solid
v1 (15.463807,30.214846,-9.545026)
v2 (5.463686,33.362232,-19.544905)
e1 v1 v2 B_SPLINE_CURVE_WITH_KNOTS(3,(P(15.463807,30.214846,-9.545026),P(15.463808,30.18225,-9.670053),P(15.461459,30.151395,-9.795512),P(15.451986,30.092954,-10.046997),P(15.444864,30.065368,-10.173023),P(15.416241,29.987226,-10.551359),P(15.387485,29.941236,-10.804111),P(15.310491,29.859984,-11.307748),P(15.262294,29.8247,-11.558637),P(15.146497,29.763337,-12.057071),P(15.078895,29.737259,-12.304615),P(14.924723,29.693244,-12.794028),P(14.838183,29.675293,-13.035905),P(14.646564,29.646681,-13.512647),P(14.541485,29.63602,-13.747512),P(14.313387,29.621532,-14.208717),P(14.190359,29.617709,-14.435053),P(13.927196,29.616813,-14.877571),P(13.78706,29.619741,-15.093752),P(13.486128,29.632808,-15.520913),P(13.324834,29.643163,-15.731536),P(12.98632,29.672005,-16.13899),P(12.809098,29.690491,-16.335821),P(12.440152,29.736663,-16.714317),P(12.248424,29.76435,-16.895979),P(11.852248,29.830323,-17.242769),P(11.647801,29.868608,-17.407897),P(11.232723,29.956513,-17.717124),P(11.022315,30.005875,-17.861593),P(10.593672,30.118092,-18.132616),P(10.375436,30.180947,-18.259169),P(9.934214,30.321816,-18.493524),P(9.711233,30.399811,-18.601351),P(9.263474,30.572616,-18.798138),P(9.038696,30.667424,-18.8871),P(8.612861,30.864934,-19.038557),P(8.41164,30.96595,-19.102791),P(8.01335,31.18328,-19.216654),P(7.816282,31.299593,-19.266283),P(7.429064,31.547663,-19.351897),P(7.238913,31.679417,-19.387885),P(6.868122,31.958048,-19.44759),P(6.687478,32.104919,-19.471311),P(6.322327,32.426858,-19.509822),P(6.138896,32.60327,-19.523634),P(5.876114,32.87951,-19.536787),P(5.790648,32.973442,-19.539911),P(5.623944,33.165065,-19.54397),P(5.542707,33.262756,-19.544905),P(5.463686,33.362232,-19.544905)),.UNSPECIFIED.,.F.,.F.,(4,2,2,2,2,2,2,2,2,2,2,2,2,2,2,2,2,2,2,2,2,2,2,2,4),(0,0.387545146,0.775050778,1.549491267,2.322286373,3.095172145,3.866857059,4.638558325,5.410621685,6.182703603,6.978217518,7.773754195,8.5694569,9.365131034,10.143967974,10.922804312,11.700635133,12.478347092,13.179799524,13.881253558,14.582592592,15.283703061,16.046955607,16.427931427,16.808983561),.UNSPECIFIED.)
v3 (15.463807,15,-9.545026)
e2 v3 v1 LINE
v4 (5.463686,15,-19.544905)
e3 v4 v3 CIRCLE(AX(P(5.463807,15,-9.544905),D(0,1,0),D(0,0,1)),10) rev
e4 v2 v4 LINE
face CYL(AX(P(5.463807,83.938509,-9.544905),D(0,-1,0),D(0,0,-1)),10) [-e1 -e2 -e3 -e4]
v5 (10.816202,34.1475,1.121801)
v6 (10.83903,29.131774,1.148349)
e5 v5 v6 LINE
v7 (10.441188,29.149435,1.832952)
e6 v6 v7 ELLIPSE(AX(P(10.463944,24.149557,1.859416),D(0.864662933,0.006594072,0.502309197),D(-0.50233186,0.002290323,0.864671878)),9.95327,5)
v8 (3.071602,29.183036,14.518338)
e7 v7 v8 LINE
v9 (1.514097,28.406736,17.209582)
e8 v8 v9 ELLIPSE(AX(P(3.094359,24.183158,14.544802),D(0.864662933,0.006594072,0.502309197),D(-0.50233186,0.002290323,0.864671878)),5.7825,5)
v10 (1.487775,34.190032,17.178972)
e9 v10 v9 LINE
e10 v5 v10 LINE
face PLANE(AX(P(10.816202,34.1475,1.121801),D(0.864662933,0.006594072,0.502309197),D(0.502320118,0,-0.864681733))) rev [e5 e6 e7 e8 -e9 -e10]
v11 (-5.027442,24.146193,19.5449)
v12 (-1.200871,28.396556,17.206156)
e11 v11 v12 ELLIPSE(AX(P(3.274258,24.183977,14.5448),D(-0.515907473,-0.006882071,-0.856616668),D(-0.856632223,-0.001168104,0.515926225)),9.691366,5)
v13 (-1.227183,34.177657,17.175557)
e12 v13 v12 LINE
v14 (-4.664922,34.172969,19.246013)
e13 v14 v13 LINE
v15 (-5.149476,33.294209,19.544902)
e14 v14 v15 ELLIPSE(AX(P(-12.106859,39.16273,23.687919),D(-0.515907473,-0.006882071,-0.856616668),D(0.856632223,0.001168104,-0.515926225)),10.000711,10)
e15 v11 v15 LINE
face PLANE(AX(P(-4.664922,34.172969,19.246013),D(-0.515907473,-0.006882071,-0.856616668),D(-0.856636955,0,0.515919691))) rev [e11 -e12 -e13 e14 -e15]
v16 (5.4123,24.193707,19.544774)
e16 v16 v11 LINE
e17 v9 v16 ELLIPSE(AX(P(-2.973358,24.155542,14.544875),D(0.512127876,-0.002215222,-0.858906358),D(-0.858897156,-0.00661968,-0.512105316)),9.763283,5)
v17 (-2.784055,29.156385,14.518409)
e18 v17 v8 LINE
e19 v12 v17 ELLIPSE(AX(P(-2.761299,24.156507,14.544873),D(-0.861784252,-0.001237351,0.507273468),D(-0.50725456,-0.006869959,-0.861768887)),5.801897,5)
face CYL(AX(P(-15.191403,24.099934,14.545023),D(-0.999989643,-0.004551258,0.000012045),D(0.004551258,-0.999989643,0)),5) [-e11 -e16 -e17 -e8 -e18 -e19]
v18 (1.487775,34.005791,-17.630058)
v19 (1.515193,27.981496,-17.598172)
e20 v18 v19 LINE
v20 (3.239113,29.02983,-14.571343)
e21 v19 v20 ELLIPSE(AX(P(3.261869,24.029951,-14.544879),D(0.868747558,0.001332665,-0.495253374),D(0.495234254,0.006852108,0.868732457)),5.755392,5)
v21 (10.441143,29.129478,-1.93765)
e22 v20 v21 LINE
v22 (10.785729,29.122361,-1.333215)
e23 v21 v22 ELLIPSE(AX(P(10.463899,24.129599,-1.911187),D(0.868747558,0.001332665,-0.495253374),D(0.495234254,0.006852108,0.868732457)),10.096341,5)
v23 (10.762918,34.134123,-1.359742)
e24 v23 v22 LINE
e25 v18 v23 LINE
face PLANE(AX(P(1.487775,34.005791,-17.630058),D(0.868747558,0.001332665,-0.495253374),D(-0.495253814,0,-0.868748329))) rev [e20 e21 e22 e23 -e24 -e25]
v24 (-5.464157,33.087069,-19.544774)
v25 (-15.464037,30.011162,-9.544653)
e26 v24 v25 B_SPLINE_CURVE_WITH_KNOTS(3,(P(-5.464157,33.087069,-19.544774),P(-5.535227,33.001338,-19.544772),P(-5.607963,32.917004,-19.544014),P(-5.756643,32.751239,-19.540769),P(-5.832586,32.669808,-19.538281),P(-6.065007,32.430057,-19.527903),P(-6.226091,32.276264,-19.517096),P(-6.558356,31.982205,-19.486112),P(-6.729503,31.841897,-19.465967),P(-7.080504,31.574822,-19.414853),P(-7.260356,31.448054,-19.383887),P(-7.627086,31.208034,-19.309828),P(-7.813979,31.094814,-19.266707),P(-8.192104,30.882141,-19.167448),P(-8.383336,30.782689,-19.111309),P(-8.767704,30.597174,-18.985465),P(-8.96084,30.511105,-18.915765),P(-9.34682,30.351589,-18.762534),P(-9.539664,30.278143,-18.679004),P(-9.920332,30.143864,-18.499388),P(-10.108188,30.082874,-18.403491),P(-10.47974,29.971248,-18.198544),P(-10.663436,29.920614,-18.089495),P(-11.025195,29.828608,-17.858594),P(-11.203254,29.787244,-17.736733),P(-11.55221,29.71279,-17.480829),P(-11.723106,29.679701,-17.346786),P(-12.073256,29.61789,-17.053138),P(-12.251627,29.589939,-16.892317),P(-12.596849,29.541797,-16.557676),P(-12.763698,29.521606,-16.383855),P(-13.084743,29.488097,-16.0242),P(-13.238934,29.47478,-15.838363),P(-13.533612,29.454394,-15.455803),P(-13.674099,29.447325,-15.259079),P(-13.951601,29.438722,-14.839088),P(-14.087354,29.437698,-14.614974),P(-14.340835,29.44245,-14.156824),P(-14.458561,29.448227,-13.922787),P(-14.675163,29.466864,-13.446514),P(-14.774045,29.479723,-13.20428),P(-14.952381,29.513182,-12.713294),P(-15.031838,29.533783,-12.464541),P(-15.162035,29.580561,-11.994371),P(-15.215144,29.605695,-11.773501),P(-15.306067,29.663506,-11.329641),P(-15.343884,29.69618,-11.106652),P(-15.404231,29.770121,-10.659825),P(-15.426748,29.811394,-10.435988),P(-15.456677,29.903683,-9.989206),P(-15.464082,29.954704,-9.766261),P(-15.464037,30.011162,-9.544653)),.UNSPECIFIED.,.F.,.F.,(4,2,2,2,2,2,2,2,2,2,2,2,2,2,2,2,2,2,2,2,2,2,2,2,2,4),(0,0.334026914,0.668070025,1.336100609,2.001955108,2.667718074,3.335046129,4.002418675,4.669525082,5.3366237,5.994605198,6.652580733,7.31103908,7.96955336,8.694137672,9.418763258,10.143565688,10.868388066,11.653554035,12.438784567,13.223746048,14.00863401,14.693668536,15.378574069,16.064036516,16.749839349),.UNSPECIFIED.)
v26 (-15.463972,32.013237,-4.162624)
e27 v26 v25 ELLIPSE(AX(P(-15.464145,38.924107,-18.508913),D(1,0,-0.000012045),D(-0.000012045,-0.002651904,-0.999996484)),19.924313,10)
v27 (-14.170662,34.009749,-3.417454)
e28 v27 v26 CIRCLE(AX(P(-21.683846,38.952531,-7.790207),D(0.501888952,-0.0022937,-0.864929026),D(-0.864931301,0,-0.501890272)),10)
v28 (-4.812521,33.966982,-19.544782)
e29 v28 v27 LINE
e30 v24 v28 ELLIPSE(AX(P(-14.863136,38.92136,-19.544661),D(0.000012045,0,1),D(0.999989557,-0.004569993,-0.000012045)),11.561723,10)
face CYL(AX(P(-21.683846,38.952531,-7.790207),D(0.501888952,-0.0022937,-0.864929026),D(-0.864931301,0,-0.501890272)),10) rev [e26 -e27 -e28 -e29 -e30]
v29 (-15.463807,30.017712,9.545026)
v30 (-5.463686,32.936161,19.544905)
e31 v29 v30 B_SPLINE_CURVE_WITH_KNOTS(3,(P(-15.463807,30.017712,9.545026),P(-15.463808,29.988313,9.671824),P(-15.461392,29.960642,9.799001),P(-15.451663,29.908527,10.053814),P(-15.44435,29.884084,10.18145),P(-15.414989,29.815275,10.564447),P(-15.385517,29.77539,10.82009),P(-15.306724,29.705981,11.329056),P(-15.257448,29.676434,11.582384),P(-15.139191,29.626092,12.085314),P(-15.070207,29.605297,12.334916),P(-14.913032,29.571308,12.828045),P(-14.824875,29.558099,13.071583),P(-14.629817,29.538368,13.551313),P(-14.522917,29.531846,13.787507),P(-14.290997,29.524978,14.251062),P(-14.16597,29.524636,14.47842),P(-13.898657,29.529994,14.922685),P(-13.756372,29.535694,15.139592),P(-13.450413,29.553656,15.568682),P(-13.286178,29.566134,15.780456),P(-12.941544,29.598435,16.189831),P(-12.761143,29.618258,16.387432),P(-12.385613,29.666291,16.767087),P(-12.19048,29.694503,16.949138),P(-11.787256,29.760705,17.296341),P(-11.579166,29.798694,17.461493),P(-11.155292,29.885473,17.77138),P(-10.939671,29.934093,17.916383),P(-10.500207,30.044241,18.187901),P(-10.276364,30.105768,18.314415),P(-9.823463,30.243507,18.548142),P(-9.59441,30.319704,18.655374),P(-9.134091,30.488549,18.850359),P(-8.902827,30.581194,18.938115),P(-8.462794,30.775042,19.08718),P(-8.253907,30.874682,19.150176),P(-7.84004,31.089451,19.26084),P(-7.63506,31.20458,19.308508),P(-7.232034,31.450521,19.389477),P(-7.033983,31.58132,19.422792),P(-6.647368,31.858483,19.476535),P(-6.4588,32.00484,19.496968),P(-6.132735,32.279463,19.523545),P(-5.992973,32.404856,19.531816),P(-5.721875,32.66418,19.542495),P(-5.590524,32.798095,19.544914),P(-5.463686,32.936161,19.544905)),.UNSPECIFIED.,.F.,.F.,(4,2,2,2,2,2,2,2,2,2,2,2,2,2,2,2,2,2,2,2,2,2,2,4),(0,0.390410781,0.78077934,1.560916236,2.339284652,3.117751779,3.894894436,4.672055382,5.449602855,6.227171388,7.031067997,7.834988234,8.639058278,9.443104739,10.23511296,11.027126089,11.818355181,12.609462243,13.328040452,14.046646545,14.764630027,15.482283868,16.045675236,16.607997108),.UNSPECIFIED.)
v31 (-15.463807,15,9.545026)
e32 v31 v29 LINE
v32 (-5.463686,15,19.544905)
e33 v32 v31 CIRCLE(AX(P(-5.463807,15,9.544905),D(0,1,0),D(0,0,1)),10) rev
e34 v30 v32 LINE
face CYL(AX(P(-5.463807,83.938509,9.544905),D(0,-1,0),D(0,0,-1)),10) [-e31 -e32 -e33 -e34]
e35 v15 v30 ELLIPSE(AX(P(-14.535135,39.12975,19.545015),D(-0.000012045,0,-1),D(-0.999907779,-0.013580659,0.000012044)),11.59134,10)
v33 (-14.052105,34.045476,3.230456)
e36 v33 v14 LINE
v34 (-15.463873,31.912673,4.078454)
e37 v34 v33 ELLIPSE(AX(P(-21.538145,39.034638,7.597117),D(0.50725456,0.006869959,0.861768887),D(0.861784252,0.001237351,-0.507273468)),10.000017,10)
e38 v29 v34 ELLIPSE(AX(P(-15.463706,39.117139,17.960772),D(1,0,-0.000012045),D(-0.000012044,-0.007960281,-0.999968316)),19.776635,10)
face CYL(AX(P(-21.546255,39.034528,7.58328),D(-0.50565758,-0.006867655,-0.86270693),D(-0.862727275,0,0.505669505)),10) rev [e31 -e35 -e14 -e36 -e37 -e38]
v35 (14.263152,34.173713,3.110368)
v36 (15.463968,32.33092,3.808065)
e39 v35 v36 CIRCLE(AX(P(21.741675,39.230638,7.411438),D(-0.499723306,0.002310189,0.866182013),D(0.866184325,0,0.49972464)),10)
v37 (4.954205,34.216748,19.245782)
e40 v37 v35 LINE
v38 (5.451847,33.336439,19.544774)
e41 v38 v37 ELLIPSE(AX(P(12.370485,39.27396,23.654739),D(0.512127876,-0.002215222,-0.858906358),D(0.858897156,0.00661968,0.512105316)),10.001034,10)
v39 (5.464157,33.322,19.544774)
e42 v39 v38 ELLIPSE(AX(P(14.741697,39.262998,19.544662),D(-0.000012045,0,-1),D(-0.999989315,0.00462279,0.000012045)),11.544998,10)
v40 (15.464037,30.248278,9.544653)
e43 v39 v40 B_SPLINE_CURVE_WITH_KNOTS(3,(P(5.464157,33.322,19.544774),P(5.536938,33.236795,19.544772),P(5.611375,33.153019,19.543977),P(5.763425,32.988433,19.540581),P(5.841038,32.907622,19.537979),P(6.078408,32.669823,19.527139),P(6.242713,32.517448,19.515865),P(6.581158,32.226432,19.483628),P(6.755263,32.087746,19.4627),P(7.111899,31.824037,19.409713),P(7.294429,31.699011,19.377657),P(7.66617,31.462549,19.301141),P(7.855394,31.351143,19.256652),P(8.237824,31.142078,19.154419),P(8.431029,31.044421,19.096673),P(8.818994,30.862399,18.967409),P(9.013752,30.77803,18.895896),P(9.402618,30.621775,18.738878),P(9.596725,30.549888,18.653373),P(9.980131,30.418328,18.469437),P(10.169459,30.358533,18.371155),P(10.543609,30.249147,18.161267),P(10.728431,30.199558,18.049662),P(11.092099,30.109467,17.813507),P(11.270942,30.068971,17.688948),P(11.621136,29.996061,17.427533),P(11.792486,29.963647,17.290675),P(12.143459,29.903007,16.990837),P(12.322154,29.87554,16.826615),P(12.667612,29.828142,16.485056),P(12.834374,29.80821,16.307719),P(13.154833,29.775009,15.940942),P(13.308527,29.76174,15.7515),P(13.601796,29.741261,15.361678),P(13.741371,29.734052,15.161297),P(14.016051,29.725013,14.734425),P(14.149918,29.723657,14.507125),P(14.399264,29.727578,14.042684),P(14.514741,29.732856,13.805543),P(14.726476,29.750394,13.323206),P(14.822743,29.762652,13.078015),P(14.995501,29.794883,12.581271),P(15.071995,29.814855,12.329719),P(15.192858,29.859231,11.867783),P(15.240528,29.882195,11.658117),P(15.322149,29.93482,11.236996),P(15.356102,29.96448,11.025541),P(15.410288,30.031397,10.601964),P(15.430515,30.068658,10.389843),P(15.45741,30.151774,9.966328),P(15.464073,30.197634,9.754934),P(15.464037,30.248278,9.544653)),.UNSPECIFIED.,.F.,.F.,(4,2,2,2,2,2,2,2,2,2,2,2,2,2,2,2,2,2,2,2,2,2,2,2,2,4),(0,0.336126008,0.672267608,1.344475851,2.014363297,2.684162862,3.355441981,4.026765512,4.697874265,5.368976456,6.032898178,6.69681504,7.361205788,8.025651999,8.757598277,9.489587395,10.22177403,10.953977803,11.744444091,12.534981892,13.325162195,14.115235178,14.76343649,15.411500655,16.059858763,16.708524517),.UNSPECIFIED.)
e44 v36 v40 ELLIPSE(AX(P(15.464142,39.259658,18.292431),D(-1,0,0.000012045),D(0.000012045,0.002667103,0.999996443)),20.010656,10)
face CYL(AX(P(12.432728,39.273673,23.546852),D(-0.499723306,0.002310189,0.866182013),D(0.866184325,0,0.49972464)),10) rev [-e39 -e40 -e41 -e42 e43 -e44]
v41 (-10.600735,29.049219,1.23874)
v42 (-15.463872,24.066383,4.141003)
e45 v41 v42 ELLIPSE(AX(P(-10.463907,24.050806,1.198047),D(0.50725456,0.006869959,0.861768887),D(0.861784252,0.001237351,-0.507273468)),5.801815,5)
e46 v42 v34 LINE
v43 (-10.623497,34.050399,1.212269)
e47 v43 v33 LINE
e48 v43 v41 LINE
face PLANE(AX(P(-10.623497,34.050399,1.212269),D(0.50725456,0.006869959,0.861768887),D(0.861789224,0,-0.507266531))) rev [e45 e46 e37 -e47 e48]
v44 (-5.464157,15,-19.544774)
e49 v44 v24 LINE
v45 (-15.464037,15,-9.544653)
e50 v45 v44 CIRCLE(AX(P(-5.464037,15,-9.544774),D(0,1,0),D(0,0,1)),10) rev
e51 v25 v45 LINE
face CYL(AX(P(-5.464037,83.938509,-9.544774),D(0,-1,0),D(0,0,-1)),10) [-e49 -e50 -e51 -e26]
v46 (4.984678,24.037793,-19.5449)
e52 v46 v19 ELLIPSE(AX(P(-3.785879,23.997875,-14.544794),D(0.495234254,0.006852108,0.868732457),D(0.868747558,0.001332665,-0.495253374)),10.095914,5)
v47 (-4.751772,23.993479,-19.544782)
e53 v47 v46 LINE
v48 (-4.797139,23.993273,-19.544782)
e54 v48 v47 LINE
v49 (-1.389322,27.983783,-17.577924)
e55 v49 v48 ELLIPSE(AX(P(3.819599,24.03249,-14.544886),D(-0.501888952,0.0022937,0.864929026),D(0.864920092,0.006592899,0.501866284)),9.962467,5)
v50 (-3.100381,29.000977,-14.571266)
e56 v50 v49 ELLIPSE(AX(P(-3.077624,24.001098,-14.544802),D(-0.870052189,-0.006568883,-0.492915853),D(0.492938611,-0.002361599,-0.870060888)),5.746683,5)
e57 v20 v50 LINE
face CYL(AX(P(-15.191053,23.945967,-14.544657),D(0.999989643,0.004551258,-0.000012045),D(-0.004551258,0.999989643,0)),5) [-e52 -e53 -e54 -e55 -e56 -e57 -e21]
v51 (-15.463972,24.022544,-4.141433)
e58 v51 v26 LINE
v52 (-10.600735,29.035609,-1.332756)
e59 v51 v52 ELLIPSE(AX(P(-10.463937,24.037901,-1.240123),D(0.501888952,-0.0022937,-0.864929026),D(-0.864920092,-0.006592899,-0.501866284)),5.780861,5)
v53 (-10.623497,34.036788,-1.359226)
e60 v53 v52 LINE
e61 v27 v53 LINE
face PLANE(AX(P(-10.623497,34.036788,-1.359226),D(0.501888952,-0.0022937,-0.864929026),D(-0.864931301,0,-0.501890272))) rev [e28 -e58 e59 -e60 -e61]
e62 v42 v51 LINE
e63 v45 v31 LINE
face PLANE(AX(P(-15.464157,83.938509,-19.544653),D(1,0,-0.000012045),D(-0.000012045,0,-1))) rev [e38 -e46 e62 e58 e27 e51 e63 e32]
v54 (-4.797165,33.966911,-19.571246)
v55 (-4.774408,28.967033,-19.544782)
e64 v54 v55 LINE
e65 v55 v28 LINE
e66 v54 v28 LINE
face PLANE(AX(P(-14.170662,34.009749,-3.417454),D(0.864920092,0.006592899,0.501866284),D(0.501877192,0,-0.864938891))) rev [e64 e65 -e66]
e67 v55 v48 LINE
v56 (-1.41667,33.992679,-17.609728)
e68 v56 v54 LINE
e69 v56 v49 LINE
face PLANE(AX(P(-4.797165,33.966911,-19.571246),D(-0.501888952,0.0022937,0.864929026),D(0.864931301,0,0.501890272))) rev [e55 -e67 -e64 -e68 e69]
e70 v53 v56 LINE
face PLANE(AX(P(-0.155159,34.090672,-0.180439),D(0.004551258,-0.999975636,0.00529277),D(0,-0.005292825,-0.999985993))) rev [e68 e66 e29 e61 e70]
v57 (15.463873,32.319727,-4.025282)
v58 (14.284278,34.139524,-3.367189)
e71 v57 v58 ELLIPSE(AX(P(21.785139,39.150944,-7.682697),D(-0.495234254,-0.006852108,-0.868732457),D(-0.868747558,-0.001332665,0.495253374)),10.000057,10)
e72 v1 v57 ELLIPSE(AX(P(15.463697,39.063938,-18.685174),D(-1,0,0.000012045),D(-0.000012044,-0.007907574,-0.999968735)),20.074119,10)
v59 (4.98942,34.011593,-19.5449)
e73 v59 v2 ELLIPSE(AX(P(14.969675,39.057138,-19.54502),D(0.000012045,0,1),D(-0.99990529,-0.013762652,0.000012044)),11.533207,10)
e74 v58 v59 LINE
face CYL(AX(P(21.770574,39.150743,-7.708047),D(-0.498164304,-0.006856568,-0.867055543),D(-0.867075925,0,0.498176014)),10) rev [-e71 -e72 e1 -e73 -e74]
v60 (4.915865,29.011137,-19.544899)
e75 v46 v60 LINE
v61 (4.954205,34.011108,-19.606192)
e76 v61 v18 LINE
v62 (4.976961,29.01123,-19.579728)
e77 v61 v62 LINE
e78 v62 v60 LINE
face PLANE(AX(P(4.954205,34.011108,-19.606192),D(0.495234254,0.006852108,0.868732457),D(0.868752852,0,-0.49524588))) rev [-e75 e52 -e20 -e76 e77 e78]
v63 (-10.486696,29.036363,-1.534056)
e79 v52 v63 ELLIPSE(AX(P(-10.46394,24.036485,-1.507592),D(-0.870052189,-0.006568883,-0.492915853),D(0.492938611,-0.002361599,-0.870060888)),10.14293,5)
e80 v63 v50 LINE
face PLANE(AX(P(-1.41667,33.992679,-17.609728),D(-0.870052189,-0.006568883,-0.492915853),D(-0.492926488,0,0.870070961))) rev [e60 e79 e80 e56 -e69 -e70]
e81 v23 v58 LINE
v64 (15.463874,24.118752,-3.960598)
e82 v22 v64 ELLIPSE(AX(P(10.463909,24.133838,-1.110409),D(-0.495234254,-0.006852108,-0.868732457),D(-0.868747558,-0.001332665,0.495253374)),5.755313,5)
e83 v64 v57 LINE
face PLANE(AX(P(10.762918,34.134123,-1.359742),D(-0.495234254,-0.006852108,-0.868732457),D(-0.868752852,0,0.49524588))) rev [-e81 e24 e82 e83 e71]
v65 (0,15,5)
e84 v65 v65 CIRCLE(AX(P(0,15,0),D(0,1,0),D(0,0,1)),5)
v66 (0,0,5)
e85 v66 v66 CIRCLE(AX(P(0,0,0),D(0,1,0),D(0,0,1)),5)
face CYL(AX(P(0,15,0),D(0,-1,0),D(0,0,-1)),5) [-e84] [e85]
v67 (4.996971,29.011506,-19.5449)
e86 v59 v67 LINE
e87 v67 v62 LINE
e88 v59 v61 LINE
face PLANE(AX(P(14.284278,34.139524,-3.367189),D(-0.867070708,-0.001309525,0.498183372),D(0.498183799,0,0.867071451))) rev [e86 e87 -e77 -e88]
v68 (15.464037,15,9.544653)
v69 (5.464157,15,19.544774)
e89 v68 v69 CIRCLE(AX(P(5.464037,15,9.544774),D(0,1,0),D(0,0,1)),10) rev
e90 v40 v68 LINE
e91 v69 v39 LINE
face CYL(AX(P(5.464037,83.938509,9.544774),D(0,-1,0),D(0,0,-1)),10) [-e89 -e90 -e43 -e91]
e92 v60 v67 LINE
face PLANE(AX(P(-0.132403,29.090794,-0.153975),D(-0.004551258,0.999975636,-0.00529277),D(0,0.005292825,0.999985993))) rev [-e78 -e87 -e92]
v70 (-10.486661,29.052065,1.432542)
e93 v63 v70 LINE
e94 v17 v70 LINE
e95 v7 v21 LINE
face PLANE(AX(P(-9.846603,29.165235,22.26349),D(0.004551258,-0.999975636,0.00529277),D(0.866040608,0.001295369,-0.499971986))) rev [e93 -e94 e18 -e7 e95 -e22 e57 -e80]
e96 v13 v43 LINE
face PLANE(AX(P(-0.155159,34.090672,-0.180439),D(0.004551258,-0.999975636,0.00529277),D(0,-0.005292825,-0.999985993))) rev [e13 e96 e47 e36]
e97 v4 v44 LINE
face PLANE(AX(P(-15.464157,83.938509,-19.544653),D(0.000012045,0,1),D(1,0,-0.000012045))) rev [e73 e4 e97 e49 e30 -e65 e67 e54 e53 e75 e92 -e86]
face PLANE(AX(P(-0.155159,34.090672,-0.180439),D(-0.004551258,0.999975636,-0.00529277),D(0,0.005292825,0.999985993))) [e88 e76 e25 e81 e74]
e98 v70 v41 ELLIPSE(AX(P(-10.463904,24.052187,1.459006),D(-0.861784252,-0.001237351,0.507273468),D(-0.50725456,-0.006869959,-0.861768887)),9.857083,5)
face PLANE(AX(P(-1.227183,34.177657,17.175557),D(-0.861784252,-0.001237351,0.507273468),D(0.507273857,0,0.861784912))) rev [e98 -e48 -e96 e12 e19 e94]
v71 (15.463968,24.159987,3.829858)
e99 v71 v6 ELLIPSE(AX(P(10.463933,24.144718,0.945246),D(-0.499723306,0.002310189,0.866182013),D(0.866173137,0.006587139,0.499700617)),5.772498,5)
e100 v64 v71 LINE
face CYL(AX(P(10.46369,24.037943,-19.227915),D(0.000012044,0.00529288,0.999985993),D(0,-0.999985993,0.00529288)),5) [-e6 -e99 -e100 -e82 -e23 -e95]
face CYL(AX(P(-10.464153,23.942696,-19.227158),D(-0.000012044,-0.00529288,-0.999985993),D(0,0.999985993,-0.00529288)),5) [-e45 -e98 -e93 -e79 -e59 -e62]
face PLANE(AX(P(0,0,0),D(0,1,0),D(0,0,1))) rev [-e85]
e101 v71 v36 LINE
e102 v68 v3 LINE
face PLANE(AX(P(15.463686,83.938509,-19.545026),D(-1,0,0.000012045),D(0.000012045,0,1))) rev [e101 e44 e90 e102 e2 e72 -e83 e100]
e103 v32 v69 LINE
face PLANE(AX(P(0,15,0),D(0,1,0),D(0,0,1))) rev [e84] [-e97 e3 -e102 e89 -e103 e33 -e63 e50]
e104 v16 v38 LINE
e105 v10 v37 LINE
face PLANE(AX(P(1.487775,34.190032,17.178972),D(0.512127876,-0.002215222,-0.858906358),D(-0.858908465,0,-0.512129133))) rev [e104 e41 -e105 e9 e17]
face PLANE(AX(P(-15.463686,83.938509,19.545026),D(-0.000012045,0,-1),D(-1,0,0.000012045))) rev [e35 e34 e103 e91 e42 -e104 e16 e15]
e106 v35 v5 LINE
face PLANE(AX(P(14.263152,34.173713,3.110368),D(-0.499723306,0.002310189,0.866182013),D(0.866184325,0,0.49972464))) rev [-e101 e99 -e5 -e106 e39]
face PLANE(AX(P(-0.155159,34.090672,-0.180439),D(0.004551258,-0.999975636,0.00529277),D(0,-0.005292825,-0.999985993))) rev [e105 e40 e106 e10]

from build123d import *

# Parameters (mm, degrees)
SKETCH1_R           = 5
BOSS_EXTRUDE1_DEPTH = 15
BOSS_EXTRUDE2_REACH = 18.583
SKETCH3_W           = 30.927843762
SKETCH3_H           = 39.089679092
BOSS_EXTRUDE3_DEPTH = 5
FILLET3_R           = 10
FILLET4_R           = 10
FILLET5_R           = 5


with BuildPart() as part:
    # Sketch1 → Boss-Extrude1 (new body)
    with BuildSketch(Plane(origin=(0, 0, 0), x_dir=(1, 0, 0), z_dir=(0, 1, 0))):
        with Locations(Location((0, 0, 0), (0, 0, 270))):
            Circle(SKETCH1_R)
    extrude(amount=BOSS_EXTRUDE1_DEPTH)

    # Boss-Extrude2: up to this plane
    boss_extrude2_end = Plane(origin=(-9.846603066, 29.165234705, 22.263489811), z_dir=(0.00455125846969128, -0.999975636016732, 0.005292770472472197))
    # Sketch3 → Boss-Extrude2 (add, up to the surface)
    with BuildSketch(Plane(origin=(0, 15, 0), x_dir=(0.9999999999274632, 0, -1.2044654693728269e-05), z_dir=(0, 1, 0)), mode=Mode.PRIVATE) as boss_extrude2_sk1:
        Rectangle(SKETCH3_W, SKETCH3_H)
    boss_extrude2_tool1 = split(extrude(boss_extrude2_sk1.sketch, amount=BOSS_EXTRUDE2_REACH, mode=Mode.PRIVATE), bisect_by=boss_extrude2_end, keep=Keep.BOTH, mode=Mode.PRIVATE)
    add(boss_extrude2_tool1.solids().sort_by_distance((0, 15, 0))[0])

    # Sketch4 → Boss-Extrude3 (add)
    with BuildSketch(Plane(origin=(-0.13240295, 29.090794233, -0.153974648), x_dir=(0.999989642969537, 0.004551194719768432, -2.408901593164283e-05), z_dir=(-0.00455125846969128, 0.9999756360167321, -0.005292770472472199))):
        Polygon((-10.468446008, 1.179056561), (-14.015647607, 3.23739849), (-4.642053476, 19.39119083), (-1.261524033, 17.429564094), align=None)
        Polygon((1.642950919, 17.449824818), (10.918190552, 1.179056561), (14.439586423, 3.186447364), (5.10941674, 19.425902448), align=None)
        Polygon((-4.509809714, -19.426615257), (-1.0720352, -17.35621268), (-10.468446008, -1.392474744), (-13.897089917, -3.410607765), align=None)
        Polygon((1.642950919, -17.359692849), (5.10941674, -19.426615257), (14.418460095, -3.291199551), (10.971474425, -1.302521996), align=None)
    extrude(amount=BOSS_EXTRUDE3_DEPTH)

    # Fillet3
    # the kernel refuses this fillet: 10 mm, written as the material it adds along each edge
    with BuildSketch(Plane(origin=(-14.147905396, 29.009871307, -3.390990168), x_dir=(-0.8649200924486613, -0.00659289857656894, -0.5018662843496846), z_dir=(0.501888951586844, -0.0022937003490612054, -0.8649290255354872))) as fillet3_piece_1_section:
        with BuildLine():
            CenterArc((8.660254038, 10), FILLET3_R, 210, 60)
            Line((0, 5), (0, 0))
            Line((0, 0), (8.660254038, 0))
        make_face()
    fillet3_piece_1 = extrude(amount=40.327071422, mode=Mode.PRIVATE)
    fillet3_piece_1 = split(fillet3_piece_1, bisect_by=Plane(origin=(-14.148099961, 29.009871307, -19.544669139), z_dir=(1.2044654693728269e-05, 0, 0.9999999999274632)), keep=Keep.TOP, mode=Mode.PRIVATE)
    fillet3_piece_1 = split(fillet3_piece_1, bisect_by=Plane(origin=(-15.463962725, 29.009871307, -3.390974317), z_dir=(0.9999999999274632, 0, -1.2044654693728269e-05)), keep=Keep.TOP, mode=Mode.PRIVATE)
    add(fillet3_piece_1)
    with BuildSketch(Plane(origin=(25.092607476, 29.288095335, 15.431577947), x_dir=(0.8670707080024372, 0.0013095245658877922, -0.4981833723334847), z_dir=(-0.4981643035891815, -0.006856567533653001, -0.8670555426909873))) as fillet3_piece_2_section:
        with BuildLine():
            CenterArc((8.660254038, -10), FILLET3_R, 90, 60)
            Line((0, -5), (0, 0))
            Line((0, 0), (8.660254038, 0))
        make_face()
    fillet3_piece_2 = extrude(amount=61.99000894, mode=Mode.PRIVATE)
    fillet3_piece_2 = split(fillet3_piece_2, bisect_by=Plane(origin=(25.092186194, 29.288095335, -19.545141774), z_dir=(1.2044654693728269e-05, 0, 0.9999999999274632)), keep=Keep.TOP, mode=Mode.PRIVATE)
    fillet3_piece_2 = split(fillet3_piece_2, bisect_by=Plane(origin=(15.464107751, 29.288095335, 15.431693919), z_dir=(-0.9999999999274632, 0, 1.2044654693728269e-05)), keep=Keep.TOP, mode=Mode.PRIVATE)
    fillet3_piece_2 = split(fillet3_piece_2, bisect_by=Plane(origin=(14.370532456, 29.1397437, -3.376924296), z_dir=(-0.4952342540982205, -0.006852107536017414, -0.8687324571984713)), keep=Keep.TOP, mode=Mode.PRIVATE)
    add(fillet3_piece_2)
    with BuildSketch(Plane(origin=(-5.84236608, 29.266886921, 38.025636113), x_dir=(0.8661731369644169, 0.006587138984293146, 0.49970061677090505), z_dir=(0.49972330628815326, -0.0023101889389853464, -0.8661820133086942))) as fillet3_piece_3_section:
        with BuildLine():
            CenterArc((8.660254038, -10), FILLET3_R, 90, 60)
            Line((0, -5), (0, 0))
            Line((0, 0), (8.660254038, 0))
        make_face()
    fillet3_piece_3 = extrude(amount=40.27883759, mode=Mode.PRIVATE)
    fillet3_piece_3 = split(fillet3_piece_3, bisect_by=Plane(origin=(15.464379885, 29.266886921, 38.02537948), z_dir=(-0.9999999999274632, 0, 1.2044654693728269e-05)), keep=Keep.TOP, mode=Mode.PRIVATE)
    fillet3_piece_3 = split(fillet3_piece_3, bisect_by=Plane(origin=(-5.842588674, 29.266886921, 19.54490992), z_dir=(-1.2044654693728269e-05, 0, -0.9999999999274632)), keep=Keep.TOP, mode=Mode.PRIVATE)
    fillet3_piece_3 = split(fillet3_piece_3, bisect_by=Plane(origin=(5.244381098, 29.218930921, 19.431690955), z_dir=(0.5121278759381178, -0.0022152218479130122, -0.8589063578058298)), keep=Keep.TOP, mode=Mode.PRIVATE)
    add(fillet3_piece_3)
    with BuildSketch(Plane(origin=(-24.977156683, 28.89690852, -15.421232823), x_dir=(-0.8627222599150277, -0.0012500727128449166, 0.5056765167232111), z_dir=(0.5056575800810756, 0.006867655432883244, 0.8627069299683444))) as fillet3_piece_4_section:
        with BuildLine():
            CenterArc((8.660254038, -10), FILLET3_R, 90, 60)
            Line((0, -5), (0, 0))
            Line((0, 0), (8.660254038, 0))
        make_face()
    fillet3_piece_4 = extrude(amount=61.865578029, mode=Mode.PRIVATE)
    fillet3_piece_4 = split(fillet3_piece_4, bisect_by=Plane(origin=(-15.464107627, 28.89690852, -15.421347404), z_dir=(0.9999999999274632, 0, -1.2044654693728269e-05)), keep=Keep.TOP, mode=Mode.PRIVATE)
    fillet3_piece_4 = split(fillet3_piece_4, bisect_by=Plane(origin=(-24.976735525, 28.89690852, 19.545140384), z_dir=(-1.2044654693728269e-05, 0, -0.9999999999274632)), keep=Keep.TOP, mode=Mode.PRIVATE)
    fillet3_piece_4 = split(fillet3_piece_4, bisect_by=Plane(origin=(-13.994792141, 29.045647238, 3.236578891), z_dir=(0.5072545599631075, 0.006869958912506911, 0.8617688872668674)), keep=Keep.TOP, mode=Mode.PRIVATE)
    fillet3_piece_4 = split(fillet3_piece_4, bisect_by=Plane(origin=(-4.231441732, 29.173650955, 19.025109137), z_dir=(-0.5159074727393343, -0.006882071338550758, -0.8566166684496653)), keep=Keep.TOP, mode=Mode.PRIVATE)
    add(fillet3_piece_4)

    # Fillet4
    fillet4_edges = [part.edges().sort_by_distance(p)[0] for p in [
        (15.463686469, 22.029571456, -19.545025802),
        (-15.464157291, 21.959190422, -19.544653287),
        (-15.463686469, 22.062640363, 19.545025802),
        (15.464157291, 22.133021398, 19.544653287),
    ]]
    fillet(fillet4_edges, radius=FILLET4_R)

    # Fillet5
    # the kernel refuses this fillet: 5 mm, written as the material it takes off along each edge
    with BuildSketch(Plane(origin=(-15.464121796, 28.933978949, -16.597696934), x_dir=(6.375187728904126e-08, -0.9999859926119807, 0.00529288010702584), z_dir=(1.2044485979576416e-05, 0.005292880107409781, 0.999985992539445))) as fillet5_piece_1_section:
        with BuildLine():
            CenterArc((FILLET5_R * 0.995459114993, FILLET5_R), FILLET5_R, 180.260765149, 89.739234851)
            Line((-FILLET5_R * 0.00453052826693, FILLET5_R * 0.99544880528), (0, 0))
            Line((0, 0), (FILLET5_R * 0.995459114992, 0))
        make_face()
    fillet5_piece_1 = extrude(amount=33.142551861, mode=Mode.PRIVATE)
    fillet5_piece_1 = split(fillet5_piece_1, bisect_by=Plane(origin=(-6.415383651, 29.056529763, -1.224900675), z_dir=(-0.507254559962968, -0.006869958912999567, -0.8617688872669456)), keep=Keep.TOP, mode=Mode.PRIVATE)
    fillet5_piece_1 = split(fillet5_piece_1, bisect_by=Plane(origin=(-5.235440397, 29.011205363, -10.802781085), z_dir=(0.8700521889032995, 0.006568882911342859, 0.4929158532263639)), keep=Keep.TOP, mode=Mode.PRIVATE)
    add(fillet5_piece_1, mode=Mode.SUBTRACT)
    with BuildSketch(Plane(origin=(-15.464121796, 28.933978949, -16.597696934), x_dir=(6.375187728904126e-08, -0.9999859926119807, 0.00529288010702584), z_dir=(1.2044485979576416e-05, 0.005292880107409781, 0.999985992539445))) as fillet5_piece_2_section:
        with BuildLine():
            CenterArc((FILLET5_R * 0.995459114993, FILLET5_R), FILLET5_R, 180.260765149, 89.739234851)
            Line((-FILLET5_R * 0.00453052826693, FILLET5_R * 0.99544880528), (0, 0))
            Line((0, 0), (FILLET5_R * 0.995459114992, 0))
        make_face()
    fillet5_piece_2 = extrude(amount=33.142551861, mode=Mode.PRIVATE)
    fillet5_piece_2 = split(fillet5_piece_2, bisect_by=Plane(origin=(-20.86567334, 28.95866477, -7.288947062), z_dir=(-0.5018889515871722, 0.002293700349000787, 0.8649290255352967)), keep=Keep.TOP, mode=Mode.PRIVATE)
    fillet5_piece_2 = split(fillet5_piece_2, bisect_by=Plane(origin=(-19.64947868, 28.927969608, -14.134063493), z_dir=(0.8617842522597962, 0.0012373509900901443, -0.507273468180183)), keep=Keep.TOP, mode=Mode.PRIVATE)
    add(fillet5_piece_2, mode=Mode.SUBTRACT)
    with BuildSketch(Plane(origin=(-15.464121796, 28.933978949, -16.597696934), x_dir=(6.375187728904126e-08, -0.9999859926119807, 0.00529288010702584), z_dir=(1.2044485979576416e-05, 0.005292880107409781, 0.999985992539445))) as fillet5_piece_3_section:
        with BuildLine():
            CenterArc((FILLET5_R * 0.995459114993, FILLET5_R), FILLET5_R, 180.260765149, 89.739234851)
            Line((-FILLET5_R * 0.00453052826693, FILLET5_R * 0.99544880528), (0, 0))
            Line((0, 0), (FILLET5_R * 0.995459114992, 0))
        make_face()
    fillet5_piece_3 = extrude(amount=33.142551861, mode=Mode.PRIVATE)
    fillet5_piece_3 = split(fillet5_piece_3, bisect_by=Plane(origin=(-6.415383651, 29.056529763, -1.224900675), z_dir=(-0.507254559962968, -0.006869958912999567, -0.8617688872669456)), keep=Keep.TOP, mode=Mode.PRIVATE)
    fillet5_piece_3 = split(fillet5_piece_3, bisect_by=Plane(origin=(-20.86567334, 28.95866477, -7.288947062), z_dir=(-0.5018889515871722, 0.002293700349000787, 0.8649290255352967)), keep=Keep.TOP, mode=Mode.PRIVATE)
    add(fillet5_piece_3, mode=Mode.SUBTRACT)
    with BuildSketch(Plane(origin=(17.349750172, 29.067726965, -19.545048519), x_dir=(-1.2044529946827532e-05, 0.005292770472472884, 0.9999859931197312), z_dir=(-0.9999896428970009, -0.00455125846969128, 1.2044529946872691e-05))) as fillet5_piece_4_section:
        with BuildLine():
            CenterArc((FILLET5_R * 0.994721107865, -FILLET5_R), FILLET5_R, 90, 89.696742033)
            Line((-FILLET5_R * 0.00526488503663, -FILLET5_R * 0.99470717471), (0, 0))
            Line((0, 0), (FILLET5_R * 0.994721107865, 0))
        make_face()
    fillet5_piece_4 = extrude(amount=34.558401512, mode=Mode.PRIVATE)
    fillet5_piece_4 = split(fillet5_piece_4, bisect_by=Plane(origin=(14.300125636, 29.025532074, -24.894653871), z_dir=(-0.49523425409822125, -0.006852107536017416, -0.8687324571984709)), keep=Keep.TOP, mode=Mode.PRIVATE)
    fillet5_piece_4 = split(fillet5_piece_4, bisect_by=Plane(origin=(4.001876218, 28.966950687, -27.107099121), z_dir=(0.8700521889032995, 0.006568882911342859, 0.4929158532263639)), keep=Keep.TOP, mode=Mode.PRIVATE)
    add(fillet5_piece_4, mode=Mode.SUBTRACT)
    with BuildSketch(Plane(origin=(17.349750172, 29.067726965, -19.545048519), x_dir=(-1.2044529946827532e-05, 0.005292770472472884, 0.9999859931197312), z_dir=(-0.9999896428970009, -0.00455125846969128, 1.2044529946872691e-05))) as fillet5_piece_5_section:
        with BuildLine():
            CenterArc((FILLET5_R * 0.994721107865, -FILLET5_R), FILLET5_R, 90, 89.696742033)
            Line((-FILLET5_R * 0.00526488503663, -FILLET5_R * 0.99470717471), (0, 0))
            Line((0, 0), (FILLET5_R * 0.994721107865, 0))
        make_face()
    fillet5_piece_5 = extrude(amount=34.558401512, mode=Mode.PRIVATE)
    fillet5_piece_5 = split(fillet5_piece_5, bisect_by=Plane(origin=(11.776840375, 29.093195916, -9.940988847), z_dir=(0.5018889515868442, -0.002293700349061202, -0.8649290255354869)), keep=Keep.TOP, mode=Mode.PRIVATE)
    fillet5_piece_5 = split(fillet5_piece_5, bisect_by=Plane(origin=(4.560155488, 29.048107639, -12.25398927), z_dir=(-0.868747558047861, -0.0013326647166724062, 0.4952533739315984)), keep=Keep.TOP, mode=Mode.PRIVATE)
    add(fillet5_piece_5, mode=Mode.SUBTRACT)
    with BuildSketch(Plane(origin=(17.349750172, 29.067726965, -19.545048519), x_dir=(-1.2044529946827532e-05, 0.005292770472472884, 0.9999859931197312), z_dir=(-0.9999896428970009, -0.00455125846969128, 1.2044529946872691e-05))) as fillet5_piece_6_section:
        with BuildLine():
            CenterArc((FILLET5_R * 0.994721107865, -FILLET5_R), FILLET5_R, 90, 89.696742033)
            Line((-FILLET5_R * 0.00526488503663, -FILLET5_R * 0.99470717471), (0, 0))
            Line((0, 0), (FILLET5_R * 0.994721107865, 0))
        make_face()
    fillet5_piece_6 = extrude(amount=34.558401512, mode=Mode.PRIVATE)
    fillet5_piece_6 = split(fillet5_piece_6, bisect_by=Plane(origin=(4.560155488, 29.048107639, -12.25398927), z_dir=(-0.868747558047861, -0.0013326647166724062, 0.4952533739315984)), keep=Keep.TOP, mode=Mode.PRIVATE)
    fillet5_piece_6 = split(fillet5_piece_6, bisect_by=Plane(origin=(4.001876218, 28.966950687, -27.107099121), z_dir=(0.8700521889032995, 0.006568882911342859, 0.4929158532263639)), keep=Keep.TOP, mode=Mode.PRIVATE)
    add(fillet5_piece_6, mode=Mode.SUBTRACT)
    with BuildSketch(Plane(origin=(15.464119093, 29.249256998, 16.373305657), x_dir=(-0.9999896428970014, -0.004551130969418724, 3.613345794583441e-05), z_dir=(-1.2044485979576416e-05, -0.005292880107409781, -0.999985992539445))) as fillet5_piece_7_section:
        with BuildLine():
            CenterArc((FILLET5_R * 1.00456159871, -FILLET5_R), FILLET5_R, 90, 90.260765149)
            Line((FILLET5_R * 0.00457195544606, -FILLET5_R * 1.00455119472), (0, 0))
            Line((0, 0), (FILLET5_R * 1.00456159871, 0))
        make_face()
    fillet5_piece_7 = extrude(amount=32.930824487, mode=Mode.PRIVATE)
    fillet5_piece_7 = split(fillet5_piece_7, bisect_by=Plane(origin=(6.698473906, 29.12797471, 0.996743114), z_dir=(0.495234254098257, 0.006852107536003555, 0.8687324571984507)), keep=Keep.TOP, mode=Mode.PRIVATE)
    fillet5_piece_7 = split(fillet5_piece_7, bisect_by=Plane(origin=(20.899404838, 29.224130019, 6.952198636), z_dir=(0.49972330628790584, -0.002310188938999564, -0.8661820133088368)), keep=Keep.TOP, mode=Mode.PRIVATE)
    add(fillet5_piece_7, mode=Mode.SUBTRACT)
    with BuildSketch(Plane(origin=(15.464119093, 29.249256998, 16.373305657), x_dir=(-0.9999896428970014, -0.004551130969418724, 3.613345794583441e-05), z_dir=(-1.2044485979576416e-05, -0.005292880107409781, -0.999985992539445))) as fillet5_piece_8_section:
        with BuildLine():
            CenterArc((FILLET5_R * 1.00456159871, -FILLET5_R), FILLET5_R, 90, 90.260765149)
            Line((FILLET5_R * 0.00457195544606, -FILLET5_R * 1.00455119472), (0, 0))
            Line((0, 0), (FILLET5_R * 1.00456159871, 0))
        make_face()
    fillet5_piece_8 = extrude(amount=32.930824487, mode=Mode.PRIVATE)
    fillet5_piece_8 = split(fillet5_piece_8, bisect_by=Plane(origin=(19.551319708, 29.255526792, 14.043284841), z_dir=(-0.868747558047861, -0.0013326647166724062, 0.4952533739315984)), keep=Keep.TOP, mode=Mode.PRIVATE)
    fillet5_piece_8 = split(fillet5_piece_8, bisect_by=Plane(origin=(5.392911116, 29.172452185, 10.522632292), z_dir=(-0.8646629334649698, -0.0065940724447949885, -0.5023091973081381)), keep=Keep.TOP, mode=Mode.PRIVATE)
    add(fillet5_piece_8, mode=Mode.SUBTRACT)
    with BuildSketch(Plane(origin=(-17.660698405, 29.115281454, 19.545052265), x_dir=(0.004551258469361128, -0.9999896429695371, -5.481978292389559e-08), z_dir=(0.9999896428970009, 0.00455125846969128, -1.2044529946872691e-05))) as fillet5_piece_9_section:
        with BuildLine():
            CenterArc((FILLET5_R * 1.00530690672, FILLET5_R), FILLET5_R, 179.696742033, 90.303257967)
            Line((FILLET5_R * 0.00532091382199, FILLET5_R * 1.00529282529), (0, 0))
            Line((0, 0), (FILLET5_R * 1.00530690672, 0))
        make_face()
    fillet5_piece_9 = extrude(amount=35.66131678, mode=Mode.PRIVATE)
    fillet5_piece_9 = split(fillet5_piece_9, bisect_by=Plane(origin=(-4.414737867, 29.134300022, 11.748060936), z_dir=(0.8617842522597962, 0.0012373509900901443, -0.507273468180183)), keep=Keep.TOP, mode=Mode.PRIVATE)
    fillet5_piece_9 = split(fillet5_piece_9, bisect_by=Plane(origin=(-4.343216894, 29.216842923, 27.281585414), z_dir=(-0.8646629334649698, -0.0065940724447949885, -0.5023091973081381)), keep=Keep.TOP, mode=Mode.PRIVATE)
    add(fillet5_piece_9, mode=Mode.SUBTRACT)
    with BuildSketch(Plane(origin=(-17.660698405, 29.115281454, 19.545052265), x_dir=(0.004551258469361128, -0.9999896429695371, -5.481978292389559e-08), z_dir=(0.9999896428970009, 0.00455125846969128, -1.2044529946872691e-05))) as fillet5_piece_10_section:
        with BuildLine():
            CenterArc((FILLET5_R * 1.00530690672, FILLET5_R), FILLET5_R, 179.696742033, 90.303257967)
            Line((FILLET5_R * 0.00532091382199, FILLET5_R * 1.00529282529), (0, 0))
            Line((0, 0), (FILLET5_R * 1.00530690672, 0))
        make_face()
    fillet5_piece_10 = extrude(amount=35.66131678, mode=Mode.PRIVATE)
    fillet5_piece_10 = split(fillet5_piece_10, bisect_by=Plane(origin=(-14.315934254, 29.159899737, 25.098723951), z_dir=(0.5159074727389396, 0.006882071338999195, 0.8566166684498997)), keep=Keep.TOP, mode=Mode.PRIVATE)
    fillet5_piece_10 = split(fillet5_piece_10, bisect_by=Plane(origin=(-11.603522926, 29.089080991, 9.386365784), z_dir=(-0.5121278759379562, 0.00221522184799981, 0.8589063578059263)), keep=Keep.TOP, mode=Mode.PRIVATE)
    add(fillet5_piece_10, mode=Mode.SUBTRACT)


solid = part.part
